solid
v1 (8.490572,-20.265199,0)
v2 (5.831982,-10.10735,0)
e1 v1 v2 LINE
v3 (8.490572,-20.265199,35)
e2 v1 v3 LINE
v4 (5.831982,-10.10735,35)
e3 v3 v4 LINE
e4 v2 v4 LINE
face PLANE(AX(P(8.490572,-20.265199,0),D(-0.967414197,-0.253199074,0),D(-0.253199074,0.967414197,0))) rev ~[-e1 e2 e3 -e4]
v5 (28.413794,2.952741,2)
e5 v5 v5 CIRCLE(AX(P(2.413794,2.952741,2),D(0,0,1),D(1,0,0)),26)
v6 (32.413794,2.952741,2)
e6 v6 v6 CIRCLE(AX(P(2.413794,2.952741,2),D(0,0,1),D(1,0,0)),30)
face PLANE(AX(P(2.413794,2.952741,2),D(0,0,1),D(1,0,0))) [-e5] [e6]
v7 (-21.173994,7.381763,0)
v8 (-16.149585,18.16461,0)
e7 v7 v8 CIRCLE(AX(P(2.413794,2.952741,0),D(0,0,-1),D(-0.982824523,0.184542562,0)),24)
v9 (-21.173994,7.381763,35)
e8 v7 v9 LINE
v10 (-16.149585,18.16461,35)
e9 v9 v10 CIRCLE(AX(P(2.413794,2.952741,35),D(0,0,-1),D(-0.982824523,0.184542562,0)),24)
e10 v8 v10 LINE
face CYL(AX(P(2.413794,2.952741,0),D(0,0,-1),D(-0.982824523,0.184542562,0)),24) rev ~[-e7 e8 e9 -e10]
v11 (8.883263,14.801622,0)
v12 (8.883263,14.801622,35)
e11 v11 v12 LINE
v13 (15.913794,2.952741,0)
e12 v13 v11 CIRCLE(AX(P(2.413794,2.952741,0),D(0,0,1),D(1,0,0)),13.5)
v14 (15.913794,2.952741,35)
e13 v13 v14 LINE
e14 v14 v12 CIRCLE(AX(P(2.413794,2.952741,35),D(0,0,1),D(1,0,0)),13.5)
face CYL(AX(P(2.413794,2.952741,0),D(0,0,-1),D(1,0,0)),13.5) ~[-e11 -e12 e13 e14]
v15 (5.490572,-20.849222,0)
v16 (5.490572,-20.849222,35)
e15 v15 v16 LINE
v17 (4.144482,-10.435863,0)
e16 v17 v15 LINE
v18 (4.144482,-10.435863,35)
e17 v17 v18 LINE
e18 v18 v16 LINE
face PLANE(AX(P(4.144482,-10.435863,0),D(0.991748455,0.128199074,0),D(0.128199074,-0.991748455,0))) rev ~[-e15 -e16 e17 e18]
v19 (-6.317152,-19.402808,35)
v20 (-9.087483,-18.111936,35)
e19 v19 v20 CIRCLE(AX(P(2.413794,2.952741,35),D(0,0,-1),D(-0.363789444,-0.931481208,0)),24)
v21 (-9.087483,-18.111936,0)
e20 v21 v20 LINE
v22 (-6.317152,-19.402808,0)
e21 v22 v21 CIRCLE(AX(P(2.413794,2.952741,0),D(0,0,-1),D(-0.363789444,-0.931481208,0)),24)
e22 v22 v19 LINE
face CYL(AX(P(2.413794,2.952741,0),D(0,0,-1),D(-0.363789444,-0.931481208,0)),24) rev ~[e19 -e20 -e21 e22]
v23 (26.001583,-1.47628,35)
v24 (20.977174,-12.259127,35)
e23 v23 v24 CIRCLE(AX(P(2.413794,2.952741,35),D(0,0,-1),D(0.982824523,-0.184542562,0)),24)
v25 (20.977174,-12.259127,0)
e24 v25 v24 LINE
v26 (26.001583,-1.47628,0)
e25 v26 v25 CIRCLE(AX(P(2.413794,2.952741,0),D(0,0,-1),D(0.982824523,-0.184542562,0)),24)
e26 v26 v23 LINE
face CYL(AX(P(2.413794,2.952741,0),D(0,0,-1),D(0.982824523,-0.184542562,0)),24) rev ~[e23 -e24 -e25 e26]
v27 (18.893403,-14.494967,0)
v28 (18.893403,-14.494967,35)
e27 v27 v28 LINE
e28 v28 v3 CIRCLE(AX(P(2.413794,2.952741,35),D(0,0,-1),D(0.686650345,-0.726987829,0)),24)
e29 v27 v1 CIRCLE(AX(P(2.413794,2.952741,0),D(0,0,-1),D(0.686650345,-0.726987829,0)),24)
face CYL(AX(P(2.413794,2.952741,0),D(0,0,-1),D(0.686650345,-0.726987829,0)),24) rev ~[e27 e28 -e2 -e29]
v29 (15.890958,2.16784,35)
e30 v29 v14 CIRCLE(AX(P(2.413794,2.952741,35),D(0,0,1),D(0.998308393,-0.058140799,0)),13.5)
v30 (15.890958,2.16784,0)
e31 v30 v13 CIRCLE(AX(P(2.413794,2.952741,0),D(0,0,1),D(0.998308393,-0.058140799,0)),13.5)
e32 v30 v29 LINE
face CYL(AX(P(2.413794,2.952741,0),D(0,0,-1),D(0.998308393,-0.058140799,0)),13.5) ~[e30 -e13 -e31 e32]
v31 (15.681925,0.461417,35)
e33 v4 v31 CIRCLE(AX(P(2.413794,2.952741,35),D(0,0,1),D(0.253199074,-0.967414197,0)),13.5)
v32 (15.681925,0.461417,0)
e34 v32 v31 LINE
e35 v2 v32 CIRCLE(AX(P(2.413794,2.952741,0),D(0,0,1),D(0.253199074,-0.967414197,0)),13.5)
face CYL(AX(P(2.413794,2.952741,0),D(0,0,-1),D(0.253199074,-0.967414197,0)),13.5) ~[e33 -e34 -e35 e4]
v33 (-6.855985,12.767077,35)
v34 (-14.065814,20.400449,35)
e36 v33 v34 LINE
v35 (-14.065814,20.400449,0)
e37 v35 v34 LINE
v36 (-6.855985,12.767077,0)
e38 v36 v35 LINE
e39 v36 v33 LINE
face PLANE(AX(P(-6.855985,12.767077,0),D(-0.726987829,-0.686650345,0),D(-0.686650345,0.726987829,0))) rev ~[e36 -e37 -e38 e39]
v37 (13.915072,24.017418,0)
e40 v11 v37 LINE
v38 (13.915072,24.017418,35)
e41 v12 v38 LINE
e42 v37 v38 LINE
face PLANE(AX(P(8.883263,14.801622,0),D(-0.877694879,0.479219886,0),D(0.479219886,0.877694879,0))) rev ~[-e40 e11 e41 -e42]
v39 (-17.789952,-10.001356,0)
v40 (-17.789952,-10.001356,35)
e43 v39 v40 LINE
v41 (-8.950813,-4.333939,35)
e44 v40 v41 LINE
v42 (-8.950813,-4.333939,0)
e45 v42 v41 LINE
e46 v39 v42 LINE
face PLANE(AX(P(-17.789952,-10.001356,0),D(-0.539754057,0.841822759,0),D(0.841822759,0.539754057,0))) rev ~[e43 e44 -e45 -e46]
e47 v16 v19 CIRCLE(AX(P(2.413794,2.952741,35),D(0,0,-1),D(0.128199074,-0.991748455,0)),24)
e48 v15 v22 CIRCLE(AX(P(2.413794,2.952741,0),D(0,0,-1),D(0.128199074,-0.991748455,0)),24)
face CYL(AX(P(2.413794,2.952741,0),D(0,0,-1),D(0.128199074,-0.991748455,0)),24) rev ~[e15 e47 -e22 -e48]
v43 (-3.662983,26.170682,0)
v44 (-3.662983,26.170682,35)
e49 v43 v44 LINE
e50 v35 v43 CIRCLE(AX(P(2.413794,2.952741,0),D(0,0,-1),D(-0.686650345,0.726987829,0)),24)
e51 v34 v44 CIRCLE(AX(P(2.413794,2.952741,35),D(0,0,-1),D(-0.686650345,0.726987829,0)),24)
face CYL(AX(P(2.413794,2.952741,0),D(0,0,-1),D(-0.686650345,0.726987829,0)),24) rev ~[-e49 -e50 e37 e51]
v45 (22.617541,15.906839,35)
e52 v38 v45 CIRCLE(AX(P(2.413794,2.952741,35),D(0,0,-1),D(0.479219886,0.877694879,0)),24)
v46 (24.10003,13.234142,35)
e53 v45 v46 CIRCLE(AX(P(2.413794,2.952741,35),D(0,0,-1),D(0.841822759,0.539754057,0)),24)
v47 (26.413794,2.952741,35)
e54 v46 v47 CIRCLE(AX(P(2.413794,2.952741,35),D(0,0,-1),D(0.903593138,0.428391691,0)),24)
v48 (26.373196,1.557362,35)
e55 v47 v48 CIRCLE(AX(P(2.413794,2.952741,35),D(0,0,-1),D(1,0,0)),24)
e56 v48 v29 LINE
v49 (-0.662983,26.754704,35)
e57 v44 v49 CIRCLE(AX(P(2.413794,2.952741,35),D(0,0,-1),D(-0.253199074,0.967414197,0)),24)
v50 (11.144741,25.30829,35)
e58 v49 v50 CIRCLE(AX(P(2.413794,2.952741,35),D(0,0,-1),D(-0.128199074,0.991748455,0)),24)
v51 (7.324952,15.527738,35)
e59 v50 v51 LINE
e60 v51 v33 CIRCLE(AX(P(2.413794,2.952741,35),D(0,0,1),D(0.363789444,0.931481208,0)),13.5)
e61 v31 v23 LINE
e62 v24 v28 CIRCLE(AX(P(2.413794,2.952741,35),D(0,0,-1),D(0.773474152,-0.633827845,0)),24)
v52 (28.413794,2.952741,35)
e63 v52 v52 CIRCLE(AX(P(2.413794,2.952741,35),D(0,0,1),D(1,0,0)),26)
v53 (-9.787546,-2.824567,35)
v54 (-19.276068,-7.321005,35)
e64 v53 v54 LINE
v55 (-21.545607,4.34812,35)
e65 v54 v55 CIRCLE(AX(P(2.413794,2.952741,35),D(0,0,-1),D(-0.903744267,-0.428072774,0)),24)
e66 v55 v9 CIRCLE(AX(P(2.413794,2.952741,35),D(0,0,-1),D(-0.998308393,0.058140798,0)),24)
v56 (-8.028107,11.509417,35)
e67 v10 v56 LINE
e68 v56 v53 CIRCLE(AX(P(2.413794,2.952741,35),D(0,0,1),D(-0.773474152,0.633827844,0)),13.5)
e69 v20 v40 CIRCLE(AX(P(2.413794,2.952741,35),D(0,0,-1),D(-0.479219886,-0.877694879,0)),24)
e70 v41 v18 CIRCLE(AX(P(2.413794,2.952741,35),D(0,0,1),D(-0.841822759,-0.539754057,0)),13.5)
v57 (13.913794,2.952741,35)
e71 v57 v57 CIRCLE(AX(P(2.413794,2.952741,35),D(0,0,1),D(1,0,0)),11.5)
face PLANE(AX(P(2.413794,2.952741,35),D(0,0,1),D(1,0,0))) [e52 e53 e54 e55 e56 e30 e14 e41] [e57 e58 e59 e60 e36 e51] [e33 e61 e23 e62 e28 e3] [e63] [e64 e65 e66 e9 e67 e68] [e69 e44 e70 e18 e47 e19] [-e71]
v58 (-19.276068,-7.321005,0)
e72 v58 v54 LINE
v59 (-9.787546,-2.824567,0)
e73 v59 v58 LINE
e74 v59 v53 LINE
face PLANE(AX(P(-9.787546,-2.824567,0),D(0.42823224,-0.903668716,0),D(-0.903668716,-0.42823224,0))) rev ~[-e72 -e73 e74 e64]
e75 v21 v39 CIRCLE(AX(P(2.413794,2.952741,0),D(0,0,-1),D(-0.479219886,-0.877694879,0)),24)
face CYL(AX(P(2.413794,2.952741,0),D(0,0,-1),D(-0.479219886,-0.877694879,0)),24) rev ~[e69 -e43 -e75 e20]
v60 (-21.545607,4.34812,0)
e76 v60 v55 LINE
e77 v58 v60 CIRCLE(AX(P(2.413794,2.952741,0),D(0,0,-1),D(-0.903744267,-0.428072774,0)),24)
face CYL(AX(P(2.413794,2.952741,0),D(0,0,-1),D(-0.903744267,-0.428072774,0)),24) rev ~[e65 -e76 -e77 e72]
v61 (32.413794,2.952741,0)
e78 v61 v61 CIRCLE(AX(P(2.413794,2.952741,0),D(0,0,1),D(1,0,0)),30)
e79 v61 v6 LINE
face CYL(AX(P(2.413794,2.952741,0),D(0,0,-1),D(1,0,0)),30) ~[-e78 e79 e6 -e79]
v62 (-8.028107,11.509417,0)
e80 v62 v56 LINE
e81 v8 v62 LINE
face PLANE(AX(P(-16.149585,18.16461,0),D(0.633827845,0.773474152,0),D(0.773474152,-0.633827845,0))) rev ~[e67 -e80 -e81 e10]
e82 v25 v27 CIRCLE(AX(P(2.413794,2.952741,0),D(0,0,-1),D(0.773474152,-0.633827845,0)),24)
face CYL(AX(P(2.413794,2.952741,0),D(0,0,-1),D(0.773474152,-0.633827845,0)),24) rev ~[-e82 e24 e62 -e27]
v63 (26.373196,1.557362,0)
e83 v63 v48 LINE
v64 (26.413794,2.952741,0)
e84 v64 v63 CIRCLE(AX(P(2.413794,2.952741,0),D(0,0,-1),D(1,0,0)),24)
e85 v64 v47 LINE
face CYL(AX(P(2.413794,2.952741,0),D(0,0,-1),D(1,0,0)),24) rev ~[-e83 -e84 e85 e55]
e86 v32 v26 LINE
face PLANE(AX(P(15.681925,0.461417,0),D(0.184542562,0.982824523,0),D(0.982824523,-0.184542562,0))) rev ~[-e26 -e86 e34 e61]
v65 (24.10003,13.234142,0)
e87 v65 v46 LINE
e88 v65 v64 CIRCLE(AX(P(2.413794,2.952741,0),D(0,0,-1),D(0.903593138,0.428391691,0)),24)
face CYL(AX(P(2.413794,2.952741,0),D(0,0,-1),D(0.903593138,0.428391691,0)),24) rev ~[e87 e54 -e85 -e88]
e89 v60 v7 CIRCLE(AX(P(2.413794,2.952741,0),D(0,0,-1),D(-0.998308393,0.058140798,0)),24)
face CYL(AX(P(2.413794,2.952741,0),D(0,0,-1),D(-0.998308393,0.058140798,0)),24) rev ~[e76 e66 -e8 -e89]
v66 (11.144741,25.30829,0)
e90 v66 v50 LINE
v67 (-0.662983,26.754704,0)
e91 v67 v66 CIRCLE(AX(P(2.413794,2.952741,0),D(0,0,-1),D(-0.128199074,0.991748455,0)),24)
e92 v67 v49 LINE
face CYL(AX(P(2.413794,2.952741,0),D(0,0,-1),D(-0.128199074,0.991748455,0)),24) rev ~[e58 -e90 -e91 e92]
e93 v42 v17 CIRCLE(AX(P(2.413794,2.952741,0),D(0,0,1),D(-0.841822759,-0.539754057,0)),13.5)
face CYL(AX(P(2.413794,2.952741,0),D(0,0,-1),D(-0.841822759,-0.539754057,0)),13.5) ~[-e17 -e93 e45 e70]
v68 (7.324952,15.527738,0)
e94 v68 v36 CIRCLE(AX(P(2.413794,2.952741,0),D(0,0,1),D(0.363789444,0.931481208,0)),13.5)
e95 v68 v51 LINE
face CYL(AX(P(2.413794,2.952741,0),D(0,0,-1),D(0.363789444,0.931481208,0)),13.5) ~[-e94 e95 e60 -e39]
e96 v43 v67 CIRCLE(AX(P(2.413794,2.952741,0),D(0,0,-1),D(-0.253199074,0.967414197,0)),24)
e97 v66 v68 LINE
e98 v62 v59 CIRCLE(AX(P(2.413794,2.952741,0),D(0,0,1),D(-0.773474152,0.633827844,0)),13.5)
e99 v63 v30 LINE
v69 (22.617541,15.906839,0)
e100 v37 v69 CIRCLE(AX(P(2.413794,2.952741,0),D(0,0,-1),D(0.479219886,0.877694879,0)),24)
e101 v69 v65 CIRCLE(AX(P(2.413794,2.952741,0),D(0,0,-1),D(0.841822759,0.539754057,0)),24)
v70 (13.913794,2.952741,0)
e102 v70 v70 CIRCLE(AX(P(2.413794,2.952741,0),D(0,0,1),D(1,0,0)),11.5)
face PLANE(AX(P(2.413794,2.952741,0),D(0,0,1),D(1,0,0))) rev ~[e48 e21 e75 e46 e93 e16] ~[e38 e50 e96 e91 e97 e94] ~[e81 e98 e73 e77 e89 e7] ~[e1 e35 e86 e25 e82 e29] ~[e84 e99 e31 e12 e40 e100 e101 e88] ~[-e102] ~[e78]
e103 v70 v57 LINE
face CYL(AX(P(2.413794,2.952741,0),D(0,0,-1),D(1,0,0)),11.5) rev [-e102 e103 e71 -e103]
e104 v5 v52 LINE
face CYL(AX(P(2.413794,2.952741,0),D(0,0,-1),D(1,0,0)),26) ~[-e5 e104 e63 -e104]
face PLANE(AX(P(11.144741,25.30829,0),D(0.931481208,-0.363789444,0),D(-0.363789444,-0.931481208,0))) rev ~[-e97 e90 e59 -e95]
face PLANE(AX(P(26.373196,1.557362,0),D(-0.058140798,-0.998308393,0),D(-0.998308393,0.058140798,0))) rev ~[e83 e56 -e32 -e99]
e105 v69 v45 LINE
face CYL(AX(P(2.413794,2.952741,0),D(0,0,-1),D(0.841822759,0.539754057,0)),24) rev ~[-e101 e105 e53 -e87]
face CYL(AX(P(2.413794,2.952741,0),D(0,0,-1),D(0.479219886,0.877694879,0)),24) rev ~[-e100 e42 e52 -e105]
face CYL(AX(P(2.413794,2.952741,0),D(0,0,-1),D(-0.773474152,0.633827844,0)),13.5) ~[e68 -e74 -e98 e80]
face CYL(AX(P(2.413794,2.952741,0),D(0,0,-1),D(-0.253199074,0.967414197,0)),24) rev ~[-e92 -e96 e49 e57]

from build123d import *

# Parameters (mm, degrees)
F0_R     = 26
F0_R_2   = 11.5
F1_DEPTH = 35
F0_R_3   = 30
F2_DEPTH = 2


with BuildPart() as f1:
    # F0 (on Top) → F1 (new body)
    with BuildSketch(Plane.XY):
        with Locations((2.413794294, 2.9527412442)):
            Circle(F0_R)
        with BuildLine():
            ThreePointArc((11.1447409527, 25.3082902297), (12.5504756443, 24.7069980967), (13.9150715606, 24.0174183421))
            ThreePointArc((13.9150715606, 24.0174183421), (18.7767862132, 20.5098621771), (22.6175405184, 15.9068386076))
            ThreePointArc((22.6175405184, 15.9068386076), (23.4013731254, 14.5941129329), (24.1000296021, 13.2341418376))
            ThreePointArc((24.1000296021, 13.2341418376), (25.8282091639, 8.2220083947), (26.413794294, 2.9527412442))
            ThreePointArc((26.413794294, 2.9527412442), (26.4036425051, 2.2547564238), (26.3731957266, 1.5573620862))
            ThreePointArc((26.3731957266, 1.5573620862), (26.2357288345, 0.0346194598), (26.001582844, -1.4762802416))
            ThreePointArc((26.001582844, -1.4762802416), (24.1680511465, -7.1839401061), (20.9771739376, -12.259127024))
            ThreePointArc((20.9771739376, -12.259127024), (19.9709152269, -13.410250675), (18.8934025792, -14.4949666501))
            ThreePointArc((18.8934025792, -14.4949666501), (14.0551659828, -18.0348375872), (8.4905720708, -20.2651994882))
            ThreePointArc((8.4905720708, -20.2651994882), (6.9998781675, -20.6050140543), (5.4905720708, -20.8492216688))
            ThreePointArc((5.4905720708, -20.8492216688), (-0.5043274904, -20.8691932963), (-6.3171523646, -19.4028077413))
            ThreePointArc((-6.3171523646, -19.4028077413), (-7.7228870563, -18.8015156083), (-9.0874829725, -18.1119358537))
            ThreePointArc((-9.0874829725, -18.1119358537), (-13.9491976252, -14.6043796887), (-17.7899519304, -10.0013561192))
            ThreePointArc((-17.7899519304, -10.0013561192), (-18.5758384098, -8.6849268624), (-19.2760681095, -7.3210053419))
            ThreePointArc((-19.2760681095, -7.3210053419), (-21.1447698834, -1.6291856319), (-21.5456071385, 4.3481204022))
            ThreePointArc((-21.5456071385, 4.3481204022), (-21.4081402465, 5.8708630286), (-21.173994256, 7.38176273))
            ThreePointArc((-21.173994256, 7.38176273), (-19.3404625584, 13.0894225945), (-16.1495853495, 18.1646095124))
            ThreePointArc((-16.1495853495, 18.1646095124), (-15.1433266389, 19.3157331634), (-14.0658139912, 20.4004491385))
            ThreePointArc((-14.0658139912, 20.4004491385), (-9.2275773947, 23.9403200756), (-3.6629834828, 26.1706819766))
            ThreePointArc((-3.6629834828, 26.1706819766), (-2.1722895795, 26.5104965427), (-0.6629834828, 26.7547041572))
            ThreePointArc((-0.6629834828, 26.7547041572), (5.3319160784, 26.7746757847), (11.1447409527, 25.3082902297))
        make_face(mode=Mode.SUBTRACT)
        with BuildLine():
            ThreePointArc((15.8909575998, 2.1678404678), (15.9080839128, 2.5601247827), (15.913794294, 2.9527412442))
            ThreePointArc((15.913794294, 2.9527412442), (14.0238723352, 9.8415791635), (8.8832627565, 14.8016221118))
            ThreePointArc((8.8832627565, 14.8016221118), (8.1156775536, 15.1895107237), (7.3249517895, 15.5277375486))
            ThreePointArc((7.3249517895, 15.5277375486), (-0.1658778848, 16.2039785996), (-6.8559853664, 12.7670769348))
            ThreePointArc((-6.8559853664, 12.7670769348), (-7.4620862307, 12.1569241988), (-8.0281067555, 11.5094171451))
            ThreePointArc((-8.0281067555, 11.5094171451), (-10.9856411994, 4.597468716), (-9.7875463248, -2.824566702))
            ThreePointArc((-9.7875463248, -2.824566702), (-9.3933232872, -3.5926368521), (-8.9508129572, -4.3339385227))
            ThreePointArc((-8.9508129572, -4.3339385227), (-3.2880889655, -9.2840282353), (4.1444817935, -10.4358628944))
            ThreePointArc((4.1444817935, -10.4358628944), (4.9934664729, -10.2984961112), (5.8319817935, -10.1073504178))
            ThreePointArc((5.8319817935, -10.1073504178), (12.2896748188, -6.2514417104), (15.6819253534, 0.4614166584))
            ThreePointArc((15.6819253534, 0.4614166584), (15.813632473, 1.3112977405), (15.8909575998, 2.1678404678))
        make_face()
        with Locations((2.413794294, 2.9527412442)):
            Circle(F0_R_2, mode=Mode.SUBTRACT)
        with BuildLine():
            ThreePointArc((7.3249517895, 15.5277375486), (8.1156775536, 15.1895107237), (8.8832627565, 14.8016221118))
            Line((8.8832627565, 14.8016221118), (13.9150715606, 24.0174183421))
            ThreePointArc((13.9150715606, 24.0174183421), (12.5504756443, 24.7069980967), (11.1447409527, 25.3082902297))
            Line((11.1447409527, 25.3082902297), (7.3249517895, 15.5277375486))
        make_face()
        with BuildLine():
            Line((26.3731957266, 1.5573620862), (15.8909575998, 2.1678404678))
            ThreePointArc((15.8909575998, 2.1678404678), (15.813632473, 1.3112977405), (15.6819253534, 0.4614166584))
            Line((15.6819253534, 0.4614166584), (26.001582844, -1.4762802416))
            ThreePointArc((26.001582844, -1.4762802416), (26.2357288345, 0.0346194598), (26.3731957266, 1.5573620862))
        make_face()
        with BuildLine():
            ThreePointArc((-8.0281067555, 11.5094171451), (-7.4620862307, 12.1569241988), (-6.8559853664, 12.7670769348))
            Line((-6.8559853664, 12.7670769348), (-14.0658139912, 20.4004491385))
            ThreePointArc((-14.0658139912, 20.4004491385), (-15.1433266389, 19.3157331634), (-16.1495853495, 18.1646095124))
            Line((-16.1495853495, 18.1646095124), (-8.0281067555, 11.5094171451))
        make_face()
        with BuildLine():
            Line((8.4905720708, -20.2651994882), (5.8319817935, -10.1073504178))
            ThreePointArc((5.8319817935, -10.1073504178), (4.9934664729, -10.2984961112), (4.1444817935, -10.4358628944))
            Line((4.1444817935, -10.4358628944), (5.4905720708, -20.8492216688))
            ThreePointArc((5.4905720708, -20.8492216688), (6.9998781675, -20.6050140543), (8.4905720708, -20.2651994882))
        make_face()
        with BuildLine():
            ThreePointArc((-8.9508129572, -4.3339385227), (-9.3933232872, -3.5926368521), (-9.7875463248, -2.824566702))
            Line((-9.7875463248, -2.824566702), (-19.2760681095, -7.3210053419))
            ThreePointArc((-19.2760681095, -7.3210053419), (-18.5758384098, -8.6849268624), (-17.7899519304, -10.0013561192))
            Line((-17.7899519304, -10.0013561192), (-8.9508129572, -4.3339385227))
        make_face()
    extrude(amount=F1_DEPTH)

    # F0 (on Top) → F2 (join)
    with BuildSketch(Plane.XY):
        with Locations((2.413794294, 2.9527412442)):
            Circle(F0_R_3)
        with Locations((2.413794294, 2.9527412442)):
            Circle(F0_R, mode=Mode.SUBTRACT)
    extrude(amount=F2_DEPTH)


solid = f1.part
